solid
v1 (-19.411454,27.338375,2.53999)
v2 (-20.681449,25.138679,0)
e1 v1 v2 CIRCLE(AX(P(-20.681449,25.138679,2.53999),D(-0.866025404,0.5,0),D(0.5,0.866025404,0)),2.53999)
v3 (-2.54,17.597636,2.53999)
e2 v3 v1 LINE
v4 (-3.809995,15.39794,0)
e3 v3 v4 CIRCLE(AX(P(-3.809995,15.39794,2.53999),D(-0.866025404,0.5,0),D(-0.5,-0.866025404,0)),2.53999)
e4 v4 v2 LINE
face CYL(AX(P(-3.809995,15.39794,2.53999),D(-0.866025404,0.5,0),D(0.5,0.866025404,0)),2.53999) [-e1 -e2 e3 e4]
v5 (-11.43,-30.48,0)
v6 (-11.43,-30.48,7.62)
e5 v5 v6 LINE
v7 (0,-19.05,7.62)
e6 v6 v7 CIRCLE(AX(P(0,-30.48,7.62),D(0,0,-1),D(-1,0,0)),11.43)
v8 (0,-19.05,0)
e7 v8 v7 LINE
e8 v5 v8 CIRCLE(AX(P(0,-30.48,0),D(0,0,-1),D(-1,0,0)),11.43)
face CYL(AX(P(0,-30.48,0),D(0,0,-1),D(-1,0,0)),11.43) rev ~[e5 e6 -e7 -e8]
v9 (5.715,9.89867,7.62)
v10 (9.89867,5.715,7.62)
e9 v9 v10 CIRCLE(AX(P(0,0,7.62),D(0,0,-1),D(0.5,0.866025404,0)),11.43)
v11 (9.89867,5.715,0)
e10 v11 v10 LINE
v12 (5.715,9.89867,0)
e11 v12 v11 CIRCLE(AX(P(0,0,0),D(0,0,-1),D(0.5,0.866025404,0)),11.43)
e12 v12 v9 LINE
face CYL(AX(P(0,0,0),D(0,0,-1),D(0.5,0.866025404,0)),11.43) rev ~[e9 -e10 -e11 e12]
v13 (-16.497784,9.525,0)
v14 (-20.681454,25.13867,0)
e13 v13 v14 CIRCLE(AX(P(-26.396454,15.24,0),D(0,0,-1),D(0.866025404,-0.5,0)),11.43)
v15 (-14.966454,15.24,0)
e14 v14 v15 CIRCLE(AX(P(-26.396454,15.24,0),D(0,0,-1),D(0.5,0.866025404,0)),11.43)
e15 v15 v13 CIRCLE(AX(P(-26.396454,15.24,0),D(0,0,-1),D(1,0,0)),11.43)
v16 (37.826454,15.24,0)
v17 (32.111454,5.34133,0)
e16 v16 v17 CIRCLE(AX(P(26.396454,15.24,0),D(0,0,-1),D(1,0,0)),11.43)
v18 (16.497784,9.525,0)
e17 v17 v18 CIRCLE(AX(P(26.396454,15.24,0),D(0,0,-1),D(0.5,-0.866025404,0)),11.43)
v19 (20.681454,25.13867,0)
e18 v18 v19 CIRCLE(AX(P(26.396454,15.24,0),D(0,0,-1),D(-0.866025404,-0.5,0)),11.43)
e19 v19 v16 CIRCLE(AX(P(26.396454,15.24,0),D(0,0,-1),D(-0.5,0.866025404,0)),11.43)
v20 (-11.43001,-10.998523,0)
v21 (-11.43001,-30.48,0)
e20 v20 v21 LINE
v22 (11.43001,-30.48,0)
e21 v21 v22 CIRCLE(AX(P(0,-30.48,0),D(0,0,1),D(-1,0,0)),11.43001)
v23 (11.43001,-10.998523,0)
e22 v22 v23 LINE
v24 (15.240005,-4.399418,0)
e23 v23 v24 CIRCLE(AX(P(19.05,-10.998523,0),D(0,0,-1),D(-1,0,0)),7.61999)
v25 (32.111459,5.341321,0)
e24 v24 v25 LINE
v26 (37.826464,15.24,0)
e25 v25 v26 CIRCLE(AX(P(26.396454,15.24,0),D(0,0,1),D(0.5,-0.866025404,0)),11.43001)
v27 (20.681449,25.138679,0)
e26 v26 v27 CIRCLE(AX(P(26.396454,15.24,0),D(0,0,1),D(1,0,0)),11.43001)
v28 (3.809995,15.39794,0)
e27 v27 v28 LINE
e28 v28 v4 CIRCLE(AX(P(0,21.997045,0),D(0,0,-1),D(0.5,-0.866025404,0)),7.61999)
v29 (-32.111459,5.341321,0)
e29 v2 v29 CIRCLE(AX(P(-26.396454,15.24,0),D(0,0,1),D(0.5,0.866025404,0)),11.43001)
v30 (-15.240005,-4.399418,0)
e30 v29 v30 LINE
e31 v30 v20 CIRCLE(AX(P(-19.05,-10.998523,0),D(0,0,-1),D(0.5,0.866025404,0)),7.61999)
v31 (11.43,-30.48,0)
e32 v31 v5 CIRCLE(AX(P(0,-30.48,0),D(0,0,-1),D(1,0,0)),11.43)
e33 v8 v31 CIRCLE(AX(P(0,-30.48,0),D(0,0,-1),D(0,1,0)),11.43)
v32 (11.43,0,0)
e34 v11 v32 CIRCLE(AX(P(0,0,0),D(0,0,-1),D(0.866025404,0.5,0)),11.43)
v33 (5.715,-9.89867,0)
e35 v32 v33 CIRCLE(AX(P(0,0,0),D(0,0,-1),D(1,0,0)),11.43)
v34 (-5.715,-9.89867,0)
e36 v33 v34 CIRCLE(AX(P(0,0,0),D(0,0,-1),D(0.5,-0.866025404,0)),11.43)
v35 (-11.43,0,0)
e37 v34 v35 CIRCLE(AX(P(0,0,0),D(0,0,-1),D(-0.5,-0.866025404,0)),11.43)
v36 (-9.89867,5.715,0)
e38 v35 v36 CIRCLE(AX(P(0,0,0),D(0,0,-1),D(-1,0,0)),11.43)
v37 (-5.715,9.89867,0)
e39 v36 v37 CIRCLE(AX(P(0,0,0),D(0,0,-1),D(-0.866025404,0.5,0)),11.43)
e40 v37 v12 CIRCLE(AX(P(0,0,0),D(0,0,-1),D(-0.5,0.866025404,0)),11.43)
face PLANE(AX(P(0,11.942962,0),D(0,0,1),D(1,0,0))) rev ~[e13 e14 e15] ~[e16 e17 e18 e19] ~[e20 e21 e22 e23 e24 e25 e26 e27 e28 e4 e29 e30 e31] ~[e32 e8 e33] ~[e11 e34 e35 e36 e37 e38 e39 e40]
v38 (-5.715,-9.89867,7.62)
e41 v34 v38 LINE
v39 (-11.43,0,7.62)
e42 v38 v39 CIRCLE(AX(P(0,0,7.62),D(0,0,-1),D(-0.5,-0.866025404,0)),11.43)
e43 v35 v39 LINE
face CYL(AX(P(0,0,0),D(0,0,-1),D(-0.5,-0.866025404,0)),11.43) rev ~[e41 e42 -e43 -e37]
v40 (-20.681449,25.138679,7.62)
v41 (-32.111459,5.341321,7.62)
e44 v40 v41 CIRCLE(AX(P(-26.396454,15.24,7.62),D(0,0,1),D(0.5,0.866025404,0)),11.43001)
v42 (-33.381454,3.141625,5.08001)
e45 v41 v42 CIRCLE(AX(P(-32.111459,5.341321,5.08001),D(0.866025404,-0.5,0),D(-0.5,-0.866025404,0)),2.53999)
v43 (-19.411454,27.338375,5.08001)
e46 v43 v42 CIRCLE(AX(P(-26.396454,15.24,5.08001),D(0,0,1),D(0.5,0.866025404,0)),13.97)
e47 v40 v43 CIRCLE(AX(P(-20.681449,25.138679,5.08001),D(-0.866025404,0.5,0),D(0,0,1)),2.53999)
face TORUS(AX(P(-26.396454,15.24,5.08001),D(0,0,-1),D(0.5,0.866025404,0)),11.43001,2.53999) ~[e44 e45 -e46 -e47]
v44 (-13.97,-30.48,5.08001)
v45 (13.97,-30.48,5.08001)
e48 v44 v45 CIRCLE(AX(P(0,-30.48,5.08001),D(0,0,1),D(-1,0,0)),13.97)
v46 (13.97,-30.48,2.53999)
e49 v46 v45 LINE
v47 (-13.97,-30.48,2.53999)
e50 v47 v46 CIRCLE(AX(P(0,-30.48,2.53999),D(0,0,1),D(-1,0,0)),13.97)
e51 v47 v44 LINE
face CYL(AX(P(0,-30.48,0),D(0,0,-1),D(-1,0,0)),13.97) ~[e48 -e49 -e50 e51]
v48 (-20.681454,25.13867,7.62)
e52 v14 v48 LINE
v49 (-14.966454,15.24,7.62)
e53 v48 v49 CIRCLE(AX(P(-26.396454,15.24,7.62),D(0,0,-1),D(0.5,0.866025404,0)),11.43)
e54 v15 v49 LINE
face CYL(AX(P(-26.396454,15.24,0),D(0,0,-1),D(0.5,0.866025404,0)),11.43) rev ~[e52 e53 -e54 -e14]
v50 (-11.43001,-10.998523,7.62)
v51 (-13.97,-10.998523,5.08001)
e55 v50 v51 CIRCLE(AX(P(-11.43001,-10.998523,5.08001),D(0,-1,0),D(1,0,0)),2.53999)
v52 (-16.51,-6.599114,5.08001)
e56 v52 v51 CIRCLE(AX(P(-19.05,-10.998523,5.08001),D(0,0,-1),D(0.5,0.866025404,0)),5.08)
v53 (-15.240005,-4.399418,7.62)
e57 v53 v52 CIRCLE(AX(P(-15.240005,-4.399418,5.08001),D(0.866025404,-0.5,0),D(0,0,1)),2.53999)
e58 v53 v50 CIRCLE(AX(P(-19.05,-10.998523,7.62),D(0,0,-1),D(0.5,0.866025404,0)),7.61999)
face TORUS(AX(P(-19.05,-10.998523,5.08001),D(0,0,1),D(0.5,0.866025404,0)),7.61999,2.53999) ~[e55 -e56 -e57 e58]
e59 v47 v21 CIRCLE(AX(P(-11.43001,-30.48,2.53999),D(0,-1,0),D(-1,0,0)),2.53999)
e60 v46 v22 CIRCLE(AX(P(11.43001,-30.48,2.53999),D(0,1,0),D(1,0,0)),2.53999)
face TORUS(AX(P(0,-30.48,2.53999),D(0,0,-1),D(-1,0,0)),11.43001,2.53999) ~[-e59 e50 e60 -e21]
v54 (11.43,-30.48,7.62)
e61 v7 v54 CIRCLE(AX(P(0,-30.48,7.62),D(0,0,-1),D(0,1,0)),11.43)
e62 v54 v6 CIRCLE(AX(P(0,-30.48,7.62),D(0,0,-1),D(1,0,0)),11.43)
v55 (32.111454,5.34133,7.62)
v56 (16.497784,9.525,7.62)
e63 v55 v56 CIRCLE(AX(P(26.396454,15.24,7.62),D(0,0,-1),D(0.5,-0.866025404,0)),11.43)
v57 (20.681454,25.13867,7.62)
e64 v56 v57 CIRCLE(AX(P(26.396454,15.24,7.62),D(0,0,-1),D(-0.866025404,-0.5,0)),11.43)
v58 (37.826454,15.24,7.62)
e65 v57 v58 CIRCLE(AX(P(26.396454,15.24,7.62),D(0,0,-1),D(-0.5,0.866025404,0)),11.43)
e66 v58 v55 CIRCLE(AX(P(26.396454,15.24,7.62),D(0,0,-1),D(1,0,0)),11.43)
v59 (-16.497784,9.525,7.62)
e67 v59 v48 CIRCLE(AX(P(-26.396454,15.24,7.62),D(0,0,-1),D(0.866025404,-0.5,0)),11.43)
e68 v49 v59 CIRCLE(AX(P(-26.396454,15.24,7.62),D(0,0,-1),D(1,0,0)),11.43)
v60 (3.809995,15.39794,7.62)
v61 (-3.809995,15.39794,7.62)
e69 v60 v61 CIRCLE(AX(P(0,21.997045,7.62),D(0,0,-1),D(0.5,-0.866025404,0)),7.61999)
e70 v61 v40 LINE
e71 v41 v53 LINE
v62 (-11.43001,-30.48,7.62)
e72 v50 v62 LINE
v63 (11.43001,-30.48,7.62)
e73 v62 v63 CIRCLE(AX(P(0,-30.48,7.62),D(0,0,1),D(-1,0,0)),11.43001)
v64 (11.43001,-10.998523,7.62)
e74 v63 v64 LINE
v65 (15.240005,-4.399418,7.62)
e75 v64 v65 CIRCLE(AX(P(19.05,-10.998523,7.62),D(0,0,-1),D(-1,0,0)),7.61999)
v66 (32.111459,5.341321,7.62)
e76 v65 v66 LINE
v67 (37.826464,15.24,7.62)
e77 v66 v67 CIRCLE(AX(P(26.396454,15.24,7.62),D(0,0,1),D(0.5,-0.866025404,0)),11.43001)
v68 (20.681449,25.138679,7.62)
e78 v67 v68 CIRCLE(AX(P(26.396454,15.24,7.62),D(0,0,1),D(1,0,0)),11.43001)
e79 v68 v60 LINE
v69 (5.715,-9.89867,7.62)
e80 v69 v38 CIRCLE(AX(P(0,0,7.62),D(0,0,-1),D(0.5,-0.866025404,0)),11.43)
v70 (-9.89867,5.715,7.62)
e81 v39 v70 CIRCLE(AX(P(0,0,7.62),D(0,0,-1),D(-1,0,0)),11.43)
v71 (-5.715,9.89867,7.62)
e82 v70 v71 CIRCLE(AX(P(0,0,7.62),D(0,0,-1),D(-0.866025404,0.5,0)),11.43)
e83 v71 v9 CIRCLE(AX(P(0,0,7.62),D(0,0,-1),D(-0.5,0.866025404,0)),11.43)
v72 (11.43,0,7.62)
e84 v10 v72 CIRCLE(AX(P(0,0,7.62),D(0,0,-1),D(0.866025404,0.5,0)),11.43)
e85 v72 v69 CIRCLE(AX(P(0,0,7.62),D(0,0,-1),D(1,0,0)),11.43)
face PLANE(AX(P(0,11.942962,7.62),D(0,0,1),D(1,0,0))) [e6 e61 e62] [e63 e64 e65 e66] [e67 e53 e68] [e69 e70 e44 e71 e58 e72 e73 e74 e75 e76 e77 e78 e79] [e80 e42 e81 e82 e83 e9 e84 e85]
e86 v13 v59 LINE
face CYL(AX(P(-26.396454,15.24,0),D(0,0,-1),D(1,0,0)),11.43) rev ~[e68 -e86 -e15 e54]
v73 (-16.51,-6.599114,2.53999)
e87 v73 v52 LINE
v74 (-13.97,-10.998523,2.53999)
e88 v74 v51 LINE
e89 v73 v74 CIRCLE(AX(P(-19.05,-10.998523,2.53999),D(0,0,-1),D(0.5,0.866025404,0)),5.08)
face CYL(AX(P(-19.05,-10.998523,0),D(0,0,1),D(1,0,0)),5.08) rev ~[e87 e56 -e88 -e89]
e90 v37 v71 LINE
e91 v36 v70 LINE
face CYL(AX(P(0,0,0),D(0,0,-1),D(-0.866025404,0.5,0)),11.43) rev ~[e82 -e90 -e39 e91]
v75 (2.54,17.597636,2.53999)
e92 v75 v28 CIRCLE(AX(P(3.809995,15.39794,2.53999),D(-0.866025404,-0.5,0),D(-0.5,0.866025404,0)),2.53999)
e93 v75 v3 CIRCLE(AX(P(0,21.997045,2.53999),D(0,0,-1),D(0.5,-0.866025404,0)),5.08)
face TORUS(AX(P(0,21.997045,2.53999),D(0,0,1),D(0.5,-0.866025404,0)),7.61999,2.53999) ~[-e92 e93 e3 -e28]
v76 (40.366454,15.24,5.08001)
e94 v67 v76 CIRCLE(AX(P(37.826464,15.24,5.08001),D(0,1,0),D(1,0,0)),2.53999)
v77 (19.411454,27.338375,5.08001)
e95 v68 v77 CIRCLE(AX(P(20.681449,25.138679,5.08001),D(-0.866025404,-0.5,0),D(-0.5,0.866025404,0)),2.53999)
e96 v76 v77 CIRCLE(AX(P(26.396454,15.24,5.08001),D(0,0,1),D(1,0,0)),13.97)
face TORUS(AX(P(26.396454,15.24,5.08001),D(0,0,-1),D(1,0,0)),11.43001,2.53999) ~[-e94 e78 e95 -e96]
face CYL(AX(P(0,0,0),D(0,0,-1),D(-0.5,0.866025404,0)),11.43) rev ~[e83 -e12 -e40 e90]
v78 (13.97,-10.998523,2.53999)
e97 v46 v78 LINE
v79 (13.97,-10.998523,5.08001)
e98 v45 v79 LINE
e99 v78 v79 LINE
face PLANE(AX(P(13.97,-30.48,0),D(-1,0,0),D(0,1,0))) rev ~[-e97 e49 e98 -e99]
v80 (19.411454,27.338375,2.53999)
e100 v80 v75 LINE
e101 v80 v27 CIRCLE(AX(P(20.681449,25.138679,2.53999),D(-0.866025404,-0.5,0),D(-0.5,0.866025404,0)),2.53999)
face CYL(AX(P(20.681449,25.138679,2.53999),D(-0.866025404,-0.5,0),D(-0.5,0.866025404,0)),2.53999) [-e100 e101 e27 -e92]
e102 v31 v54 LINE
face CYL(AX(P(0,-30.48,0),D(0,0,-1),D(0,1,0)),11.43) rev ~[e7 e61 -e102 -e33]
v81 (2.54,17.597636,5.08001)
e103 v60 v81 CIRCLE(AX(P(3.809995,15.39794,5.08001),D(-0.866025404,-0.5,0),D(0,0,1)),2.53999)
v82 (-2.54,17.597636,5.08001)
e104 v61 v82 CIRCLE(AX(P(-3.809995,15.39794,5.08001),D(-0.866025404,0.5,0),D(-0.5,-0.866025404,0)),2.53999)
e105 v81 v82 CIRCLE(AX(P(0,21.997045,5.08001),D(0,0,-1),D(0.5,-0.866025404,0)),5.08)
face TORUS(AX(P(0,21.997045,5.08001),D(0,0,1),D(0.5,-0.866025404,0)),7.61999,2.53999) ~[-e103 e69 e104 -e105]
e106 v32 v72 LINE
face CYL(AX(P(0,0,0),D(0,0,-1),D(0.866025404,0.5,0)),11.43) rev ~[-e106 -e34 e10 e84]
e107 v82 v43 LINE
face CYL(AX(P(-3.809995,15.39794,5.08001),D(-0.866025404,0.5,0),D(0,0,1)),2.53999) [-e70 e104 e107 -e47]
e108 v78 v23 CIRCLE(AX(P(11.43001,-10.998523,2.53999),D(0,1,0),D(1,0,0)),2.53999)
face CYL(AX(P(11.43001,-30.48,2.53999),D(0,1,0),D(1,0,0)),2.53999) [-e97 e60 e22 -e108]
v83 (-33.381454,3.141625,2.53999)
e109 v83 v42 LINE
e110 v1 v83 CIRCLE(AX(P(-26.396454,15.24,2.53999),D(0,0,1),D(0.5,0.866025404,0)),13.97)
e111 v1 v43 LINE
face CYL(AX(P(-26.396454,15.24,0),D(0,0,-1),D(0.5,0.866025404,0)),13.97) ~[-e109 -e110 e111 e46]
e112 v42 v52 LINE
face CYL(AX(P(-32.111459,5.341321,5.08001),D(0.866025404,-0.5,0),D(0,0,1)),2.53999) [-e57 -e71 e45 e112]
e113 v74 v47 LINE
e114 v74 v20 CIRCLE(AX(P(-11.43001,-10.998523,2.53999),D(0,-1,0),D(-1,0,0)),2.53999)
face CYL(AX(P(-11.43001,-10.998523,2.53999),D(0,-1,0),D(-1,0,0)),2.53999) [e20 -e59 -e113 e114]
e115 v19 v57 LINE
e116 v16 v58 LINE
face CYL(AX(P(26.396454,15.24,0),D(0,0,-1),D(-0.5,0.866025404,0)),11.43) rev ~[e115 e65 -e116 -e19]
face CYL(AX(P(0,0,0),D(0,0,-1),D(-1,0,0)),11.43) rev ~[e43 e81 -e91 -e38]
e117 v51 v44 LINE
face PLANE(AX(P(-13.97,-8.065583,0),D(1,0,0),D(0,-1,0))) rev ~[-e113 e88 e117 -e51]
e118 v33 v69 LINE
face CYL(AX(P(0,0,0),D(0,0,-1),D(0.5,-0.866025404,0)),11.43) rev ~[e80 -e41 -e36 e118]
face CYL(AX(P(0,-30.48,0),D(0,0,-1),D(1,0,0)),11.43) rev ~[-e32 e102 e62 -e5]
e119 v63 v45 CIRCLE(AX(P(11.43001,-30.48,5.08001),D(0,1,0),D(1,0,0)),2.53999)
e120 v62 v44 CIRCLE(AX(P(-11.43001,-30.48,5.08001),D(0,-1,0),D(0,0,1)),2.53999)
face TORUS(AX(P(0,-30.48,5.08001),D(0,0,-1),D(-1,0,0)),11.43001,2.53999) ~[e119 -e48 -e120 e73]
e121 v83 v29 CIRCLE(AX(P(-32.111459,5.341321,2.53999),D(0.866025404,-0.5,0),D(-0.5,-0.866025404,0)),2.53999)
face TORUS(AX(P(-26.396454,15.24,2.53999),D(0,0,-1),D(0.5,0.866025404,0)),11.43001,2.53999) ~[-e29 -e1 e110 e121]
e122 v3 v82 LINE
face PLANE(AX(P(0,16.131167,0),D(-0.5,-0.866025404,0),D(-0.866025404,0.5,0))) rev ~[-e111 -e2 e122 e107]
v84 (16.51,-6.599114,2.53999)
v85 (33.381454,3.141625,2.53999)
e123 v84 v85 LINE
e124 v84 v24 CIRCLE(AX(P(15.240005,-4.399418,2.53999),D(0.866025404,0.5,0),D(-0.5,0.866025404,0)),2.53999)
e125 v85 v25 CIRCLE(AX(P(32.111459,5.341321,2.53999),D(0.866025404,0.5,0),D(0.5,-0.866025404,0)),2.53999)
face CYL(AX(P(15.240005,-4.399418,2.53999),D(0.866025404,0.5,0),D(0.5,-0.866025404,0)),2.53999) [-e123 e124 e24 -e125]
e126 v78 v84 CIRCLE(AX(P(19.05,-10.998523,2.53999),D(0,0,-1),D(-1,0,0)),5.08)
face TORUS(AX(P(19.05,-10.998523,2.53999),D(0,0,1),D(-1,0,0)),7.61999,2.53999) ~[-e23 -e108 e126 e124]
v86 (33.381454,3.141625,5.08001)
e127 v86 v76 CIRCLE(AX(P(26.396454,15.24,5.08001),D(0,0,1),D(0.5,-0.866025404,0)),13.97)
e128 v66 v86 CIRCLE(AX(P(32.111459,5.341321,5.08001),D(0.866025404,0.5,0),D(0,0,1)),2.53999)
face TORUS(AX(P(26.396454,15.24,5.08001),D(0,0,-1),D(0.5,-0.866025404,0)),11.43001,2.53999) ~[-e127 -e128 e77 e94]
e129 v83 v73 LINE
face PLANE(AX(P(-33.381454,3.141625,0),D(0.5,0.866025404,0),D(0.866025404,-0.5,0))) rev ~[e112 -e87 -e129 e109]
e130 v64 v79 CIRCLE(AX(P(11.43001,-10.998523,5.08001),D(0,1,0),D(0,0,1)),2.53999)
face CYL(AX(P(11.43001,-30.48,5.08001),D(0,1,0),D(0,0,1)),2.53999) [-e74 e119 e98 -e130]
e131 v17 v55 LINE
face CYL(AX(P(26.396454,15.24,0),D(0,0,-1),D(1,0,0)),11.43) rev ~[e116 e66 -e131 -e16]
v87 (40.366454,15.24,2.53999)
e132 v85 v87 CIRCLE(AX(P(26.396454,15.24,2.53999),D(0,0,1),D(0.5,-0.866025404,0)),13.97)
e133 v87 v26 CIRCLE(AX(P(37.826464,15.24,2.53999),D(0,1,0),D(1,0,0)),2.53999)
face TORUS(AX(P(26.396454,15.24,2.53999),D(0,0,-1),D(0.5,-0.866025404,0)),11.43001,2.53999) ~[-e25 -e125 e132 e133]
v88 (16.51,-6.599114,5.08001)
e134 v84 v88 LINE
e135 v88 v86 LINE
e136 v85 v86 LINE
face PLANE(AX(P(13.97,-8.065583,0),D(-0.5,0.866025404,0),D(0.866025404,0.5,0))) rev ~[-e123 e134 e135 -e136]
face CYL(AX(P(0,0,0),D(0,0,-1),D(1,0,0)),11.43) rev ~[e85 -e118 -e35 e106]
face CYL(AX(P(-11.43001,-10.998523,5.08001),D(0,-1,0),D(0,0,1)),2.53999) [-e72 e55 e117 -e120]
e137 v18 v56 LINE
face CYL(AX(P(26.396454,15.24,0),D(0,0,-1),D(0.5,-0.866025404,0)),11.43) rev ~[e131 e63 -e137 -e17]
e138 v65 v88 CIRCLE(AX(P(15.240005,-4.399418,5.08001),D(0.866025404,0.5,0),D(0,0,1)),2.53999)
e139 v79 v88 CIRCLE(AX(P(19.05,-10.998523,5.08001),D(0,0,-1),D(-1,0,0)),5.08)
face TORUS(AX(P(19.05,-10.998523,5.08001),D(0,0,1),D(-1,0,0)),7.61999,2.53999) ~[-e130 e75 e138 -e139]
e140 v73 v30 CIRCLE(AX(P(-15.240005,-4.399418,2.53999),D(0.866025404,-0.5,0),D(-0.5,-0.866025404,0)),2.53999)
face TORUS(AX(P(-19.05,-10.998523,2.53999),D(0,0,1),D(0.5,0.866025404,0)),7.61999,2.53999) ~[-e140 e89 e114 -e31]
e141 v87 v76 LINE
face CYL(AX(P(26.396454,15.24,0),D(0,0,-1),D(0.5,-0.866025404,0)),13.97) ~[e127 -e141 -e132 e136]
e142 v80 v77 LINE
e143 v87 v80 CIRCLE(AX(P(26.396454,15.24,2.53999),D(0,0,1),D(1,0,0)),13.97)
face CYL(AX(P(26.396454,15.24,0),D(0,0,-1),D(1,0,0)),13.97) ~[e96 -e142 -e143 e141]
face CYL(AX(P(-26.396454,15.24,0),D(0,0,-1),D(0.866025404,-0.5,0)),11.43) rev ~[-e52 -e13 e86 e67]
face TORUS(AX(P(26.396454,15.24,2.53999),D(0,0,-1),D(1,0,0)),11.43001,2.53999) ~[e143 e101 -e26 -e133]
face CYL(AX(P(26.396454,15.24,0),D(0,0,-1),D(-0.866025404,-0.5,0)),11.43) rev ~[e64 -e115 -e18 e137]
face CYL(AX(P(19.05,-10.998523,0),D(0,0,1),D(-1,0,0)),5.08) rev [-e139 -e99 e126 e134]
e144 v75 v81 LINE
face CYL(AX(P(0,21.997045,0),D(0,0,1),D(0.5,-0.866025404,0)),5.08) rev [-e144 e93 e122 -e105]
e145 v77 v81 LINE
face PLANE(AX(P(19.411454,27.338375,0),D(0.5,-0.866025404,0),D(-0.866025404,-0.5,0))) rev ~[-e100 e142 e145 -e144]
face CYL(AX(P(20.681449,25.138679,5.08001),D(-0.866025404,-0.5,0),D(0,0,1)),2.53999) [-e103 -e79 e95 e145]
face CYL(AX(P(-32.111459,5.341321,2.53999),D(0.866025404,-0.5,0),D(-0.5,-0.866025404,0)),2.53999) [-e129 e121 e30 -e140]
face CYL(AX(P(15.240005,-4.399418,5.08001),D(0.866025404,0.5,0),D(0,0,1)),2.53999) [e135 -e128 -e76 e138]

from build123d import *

# Parameters (mm, degrees)
F1_DEPTH = 7.62
F2_R     = 5.08
F3_R     = 2.53999


# Not quite as in the source:
# - a fillet or chamfer is up to 0.001 mm smaller than in the source, because OpenCascade refuses the exact size
# - a feature names something its author has since deleted; it is built from what else it names


with BuildPart() as f1:
    # F0 (on Top) → F1 (new body)
    with BuildSketch(Plane.XY):
        with BuildLine():
            Line((5.715, 9.8986703653), (6.985, 12.0983748909))
            ThreePointArc((6.985, 12.0983748909), (0, 13.97), (-6.985, 12.0983748909))
            Line((-6.985, 12.0983748909), (-5.715, 9.8986703653))
            ThreePointArc((-5.715, 9.8986703653), (0, 11.43), (5.715, 9.8986703653))
        make_face()
        with BuildLine():
            Line((0, 16.1311665212), (6.985, 12.0983748909))
            ThreePointArc((6.985, 12.0983748909), (9.8782817332, 9.8782817332), (12.0983748909, 6.985))
            Line((12.0983748909, 6.985), (14.2980794165, 8.255))
            ThreePointArc((14.2980794165, 8.255), (12.9024705141, 18.8557020601), (19.4114543073, 27.3383748909))
            Line((19.4114543073, 27.3383748909), (0, 16.1311665212))
        make_face()
        with BuildLine():
            ThreePointArc((-6.985, 12.0983748909), (0, 13.97), (6.985, 12.0983748909))
            Line((6.985, 12.0983748909), (0, 16.1311665212))
            Line((0, 16.1311665212), (-6.985, 12.0983748909))
        make_face()
        with BuildLine():
            ThreePointArc((12.0983748909, 6.985), (9.8782817332, 9.8782817332), (6.985, 12.0983748909))
            Line((6.985, 12.0983748909), (5.715, 9.8986703653))
            ThreePointArc((5.715, 9.8986703653), (8.082230509, 8.082230509), (9.8986703653, 5.715))
            Line((9.8986703653, 5.715), (12.0983748909, 6.985))
        make_face()
        with BuildLine():
            Line((-5.715, 9.8986703653), (-6.985, 12.0983748909))
            ThreePointArc((-6.985, 12.0983748909), (-9.8782817332, 9.8782817332), (-12.0983748909, 6.985))
            Line((-12.0983748909, 6.985), (-9.8986703653, 5.715))
            ThreePointArc((-9.8986703653, 5.715), (-8.082230509, 8.082230509), (-5.715, 9.8986703653))
        make_face()
        with BuildLine():
            ThreePointArc((-12.0983748909, 6.985), (-9.8782817332, 9.8782817332), (-6.985, 12.0983748909))
            Line((-6.985, 12.0983748909), (0, 16.1311665212))
            Line((0, 16.1311665212), (-19.4114543073, 27.3383748909))
            ThreePointArc((-19.4114543073, 27.3383748909), (-14.2980794165, 22.225), (-12.4264543073, 15.24))
            ThreePointArc((-12.4264543073, 15.24), (-12.9024705141, 11.6242979399), (-14.2980794165, 8.255))
            Line((-14.2980794165, 8.255), (-12.0983748909, 6.985))
        make_face()
        with BuildLine():
            Line((14.2980794165, 8.255), (12.0983748909, 6.985))
            ThreePointArc((12.0983748909, 6.985), (13.4939837933, 3.6157020601), (13.97, 0))
            Line((13.97, 0), (13.97, -8.0655832606))
            Line((13.97, -8.0655832606), (33.3814543073, 3.1416251091))
            ThreePointArc((33.3814543073, 3.1416251091), (22.7807522473, 1.7460162067), (14.2980794165, 8.255))
        make_face()
        with BuildLine():
            ThreePointArc((13.97, 0), (13.4939837933, 3.6157020601), (12.0983748909, 6.985))
            Line((12.0983748909, 6.985), (9.8986703653, 5.715))
            ThreePointArc((9.8986703653, 5.715), (11.0405321945, 2.9583016855), (11.43, 0))
            Line((11.43, 0), (13.97, 0))
        make_face()
        with BuildLine():
            Line((-9.8986703653, 5.715), (-12.0983748909, 6.985))
            ThreePointArc((-12.0983748909, 6.985), (-13.4939837933, 3.6157020601), (-13.97, 0))
            Line((-13.97, 0), (-11.43, 0))
            ThreePointArc((-11.43, 0), (-11.0405321945, 2.9583016855), (-9.8986703653, 5.715))
        make_face()
        with BuildLine():
            ThreePointArc((-13.97, 0), (-13.4939837933, 3.6157020601), (-12.0983748909, 6.985))
            Line((-12.0983748909, 6.985), (-14.2980794165, 8.255))
            ThreePointArc((-14.2980794165, 8.255), (-22.7807522473, 1.7460162067), (-33.3814543073, 3.1416251091))
            Line((-33.3814543073, 3.1416251091), (-13.97, -8.0655832606))
            Line((-13.97, -8.0655832606), (-13.97, 0))
        make_face()
        with BuildLine():
            Line((13.97, -8.0655832606), (13.97, 0))
            ThreePointArc((13.97, 0), (12.0983748909, -6.985), (6.985, -12.0983748909))
            Line((6.985, -12.0983748909), (13.97, -8.0655832606))
        make_face()
        with BuildLine():
            ThreePointArc((6.985, -12.0983748909), (12.0983748909, -6.985), (13.97, 0))
            Line((13.97, 0), (11.43, 0))
            ThreePointArc((11.43, 0), (9.8986703653, -5.715), (5.715, -9.8986703653))
            Line((5.715, -9.8986703653), (6.985, -12.0983748909))
        make_face()
        with BuildLine():
            Line((16.4977839421, 9.525), (14.2980794165, 8.255))
            ThreePointArc((14.2980794165, 8.255), (22.7807522473, 1.7460162067), (33.3814543073, 3.1416251091))
            Line((33.3814543073, 3.1416251091), (32.1114543073, 5.3413296347))
            ThreePointArc((32.1114543073, 5.3413296347), (23.4381526218, 4.1994678055), (16.4977839421, 9.525))
        make_face()
        with BuildLine():
            ThreePointArc((19.4114543073, 27.3383748909), (12.9024705141, 18.8557020601), (14.2980794165, 8.255))
            Line((14.2980794165, 8.255), (16.4977839421, 9.525))
            ThreePointArc((16.4977839421, 9.525), (15.3559221129, 18.1983016855), (20.6814543073, 25.1386703653))
            Line((20.6814543073, 25.1386703653), (19.4114543073, 27.3383748909))
        make_face()
        with BuildLine():
            ThreePointArc((40.3664543073, 15.24), (33.3814543073, 27.3383748909), (19.4114543073, 27.3383748909))
            Line((19.4114543073, 27.3383748909), (20.6814543073, 25.1386703653))
            ThreePointArc((20.6814543073, 25.1386703653), (32.1114543073, 25.1386703653), (37.8264543073, 15.24))
            ThreePointArc((37.8264543073, 15.24), (36.2951246726, 9.525), (32.1114543073, 5.3413296347))
            Line((32.1114543073, 5.3413296347), (33.3814543073, 3.1416251091))
            ThreePointArc((33.3814543073, 3.1416251091), (38.4948291982, 8.255), (40.3664543073, 15.24))
        make_face()
        with BuildLine():
            Line((-20.6814543073, 25.1386703653), (-19.4114543073, 27.3383748909))
            ThreePointArc((-19.4114543073, 27.3383748909), (-38.4948291982, 22.225), (-33.3814543073, 3.1416251091))
            Line((-33.3814543073, 3.1416251091), (-32.1114543073, 5.3413296347))
            ThreePointArc((-32.1114543073, 5.3413296347), (-36.2951246726, 20.955), (-20.6814543073, 25.1386703653))
        make_face()
        with BuildLine():
            ThreePointArc((-12.4264543073, 15.24), (-14.2980794165, 22.225), (-19.4114543073, 27.3383748909))
            Line((-19.4114543073, 27.3383748909), (-20.6814543073, 25.1386703653))
            ThreePointArc((-20.6814543073, 25.1386703653), (-16.4977839421, 20.955), (-14.9664543073, 15.24))
            ThreePointArc((-14.9664543073, 15.24), (-15.3559221129, 12.2816983145), (-16.4977839421, 9.525))
            Line((-16.4977839421, 9.525), (-14.2980794165, 8.255))
            ThreePointArc((-14.2980794165, 8.255), (-12.9024705141, 11.6242979399), (-12.4264543073, 15.24))
        make_face()
        with BuildLine():
            Line((-11.43, 0), (-13.97, 0))
            ThreePointArc((-13.97, 0), (-12.0983748909, -6.985), (-6.985, -12.0983748909))
            Line((-6.985, -12.0983748909), (-5.715, -9.8986703653))
            ThreePointArc((-5.715, -9.8986703653), (-9.8986703653, -5.715), (-11.43, 0))
        make_face()
        with BuildLine():
            ThreePointArc((-6.985, -12.0983748909), (-12.0983748909, -6.985), (-13.97, 0))
            Line((-13.97, 0), (-13.97, -8.0655832606))
            Line((-13.97, -8.0655832606), (-6.985, -12.0983748909))
        make_face()
        with BuildLine():
            ThreePointArc((-33.3814543073, 3.1416251091), (-22.7807522473, 1.7460162067), (-14.2980794165, 8.255))
            Line((-14.2980794165, 8.255), (-16.4977839421, 9.525))
            ThreePointArc((-16.4977839421, 9.525), (-23.4381526218, 4.1994678055), (-32.1114543073, 5.3413296347))
            Line((-32.1114543073, 5.3413296347), (-33.3814543073, 3.1416251091))
        make_face()
        with BuildLine():
            Line((13.97, -8.0655832606), (6.985, -12.0983748909))
            ThreePointArc((6.985, -12.0983748909), (3.6157020601, -13.4939837933), (0, -13.97))
            Line((0, -13.97), (0, -16.51))
            ThreePointArc((0, -16.51), (9.8782817332, -20.6017182668), (13.97, -30.48))
            Line((13.97, -30.48), (13.97, -8.0655832606))
        make_face()
        with BuildLine():
            ThreePointArc((0, -13.97), (3.6157020601, -13.4939837933), (6.985, -12.0983748909))
            Line((6.985, -12.0983748909), (5.715, -9.8986703653))
            ThreePointArc((5.715, -9.8986703653), (2.9583016855, -11.0405321945), (0, -11.43))
            Line((0, -11.43), (0, -13.97))
        make_face()
        with BuildLine():
            Line((0, -13.97), (0, -11.43))
            ThreePointArc((0, -11.43), (-2.9583016855, -11.0405321945), (-5.715, -9.8986703653))
            Line((-5.715, -9.8986703653), (-6.985, -12.0983748909))
            ThreePointArc((-6.985, -12.0983748909), (-3.6157020601, -13.4939837933), (0, -13.97))
        make_face()
        with BuildLine():
            ThreePointArc((0, -13.97), (-3.6157020601, -13.4939837933), (-6.985, -12.0983748909))
            Line((-6.985, -12.0983748909), (-13.97, -8.0655832606))
            Line((-13.97, -8.0655832606), (-13.97, -30.48))
            ThreePointArc((-13.97, -30.48), (-9.8782817332, -20.6017182668), (0, -16.51))
            Line((0, -16.51), (0, -13.97))
        make_face()
        with BuildLine():
            Line((11.43, -30.48), (13.97, -30.48))
            ThreePointArc((13.97, -30.48), (9.8782817332, -20.6017182668), (0, -16.51))
            Line((0, -16.51), (0, -19.05))
            ThreePointArc((0, -19.05), (8.082230509, -22.397769491), (11.43, -30.48))
        make_face()
        with BuildLine():
            ThreePointArc((-13.97, -30.48), (0, -44.45), (13.97, -30.48))
            Line((13.97, -30.48), (11.43, -30.48))
            ThreePointArc((11.43, -30.48), (0, -41.91), (-11.43, -30.48))
            Line((-11.43, -30.48), (-13.97, -30.48))
        make_face()
        with BuildLine():
            ThreePointArc((0, -16.51), (-9.8782817332, -20.6017182668), (-13.97, -30.48))
            Line((-13.97, -30.48), (-11.43, -30.48))
            ThreePointArc((-11.43, -30.48), (-8.082230509, -22.397769491), (0, -19.05))
            Line((0, -19.05), (0, -16.51))
        make_face()
    extrude(amount=F1_DEPTH)

    # F2
    f2_edges = [f1.edges().sort_by_distance(p)[0] for p in [
        (0, 16.131167, 3.81),
        (13.97, -8.065583, 3.81),
        (-13.97, -8.065583, 3.81),
    ]]
    fillet(f2_edges, radius=F2_R)

    # F3 (radius 2.54 in the source; OpenCascade refuses exactly that, so slightly less here)
    f3_edges = [f1.edges().sort_by_distance(p)[0] for p in [
        (24.945727, -1.728744, 7.62),
        (14.650591, -8.458523, 7.62),
        (-13.97, -20.739261, 0),
        (10.975727, 22.468006, 0),
        (10.975727, 22.468006, 7.62),
        (0, 16.917045, 0),
        (38.494829, 22.225, 0),
        (-10.975727, 22.468006, 0),
        (24.945727, -1.728744, 0),
        (-38.494829, 22.225, 0),
        (14.650591, -8.458523, 0),
        (-24.945727, -1.728744, 0),
        (13.97, -20.739261, 0),
        (-14.650591, -8.458523, 0),
        (0, -44.45, 0),
        (0, 16.917045, 7.62),
        (38.494829, 22.225, 7.62),
        (-10.975727, 22.468006, 7.62),
        (-38.494829, 22.225, 7.62),
        (-24.945727, -1.728744, 7.62),
        (13.97, -20.739261, 7.62),
        (-14.650591, -8.458523, 7.62),
        (0, -44.45, 7.62),
        (-13.97, -20.739261, 7.62),
    ]]
    fillet(f3_edges, radius=F3_R)


solid = f1.part
